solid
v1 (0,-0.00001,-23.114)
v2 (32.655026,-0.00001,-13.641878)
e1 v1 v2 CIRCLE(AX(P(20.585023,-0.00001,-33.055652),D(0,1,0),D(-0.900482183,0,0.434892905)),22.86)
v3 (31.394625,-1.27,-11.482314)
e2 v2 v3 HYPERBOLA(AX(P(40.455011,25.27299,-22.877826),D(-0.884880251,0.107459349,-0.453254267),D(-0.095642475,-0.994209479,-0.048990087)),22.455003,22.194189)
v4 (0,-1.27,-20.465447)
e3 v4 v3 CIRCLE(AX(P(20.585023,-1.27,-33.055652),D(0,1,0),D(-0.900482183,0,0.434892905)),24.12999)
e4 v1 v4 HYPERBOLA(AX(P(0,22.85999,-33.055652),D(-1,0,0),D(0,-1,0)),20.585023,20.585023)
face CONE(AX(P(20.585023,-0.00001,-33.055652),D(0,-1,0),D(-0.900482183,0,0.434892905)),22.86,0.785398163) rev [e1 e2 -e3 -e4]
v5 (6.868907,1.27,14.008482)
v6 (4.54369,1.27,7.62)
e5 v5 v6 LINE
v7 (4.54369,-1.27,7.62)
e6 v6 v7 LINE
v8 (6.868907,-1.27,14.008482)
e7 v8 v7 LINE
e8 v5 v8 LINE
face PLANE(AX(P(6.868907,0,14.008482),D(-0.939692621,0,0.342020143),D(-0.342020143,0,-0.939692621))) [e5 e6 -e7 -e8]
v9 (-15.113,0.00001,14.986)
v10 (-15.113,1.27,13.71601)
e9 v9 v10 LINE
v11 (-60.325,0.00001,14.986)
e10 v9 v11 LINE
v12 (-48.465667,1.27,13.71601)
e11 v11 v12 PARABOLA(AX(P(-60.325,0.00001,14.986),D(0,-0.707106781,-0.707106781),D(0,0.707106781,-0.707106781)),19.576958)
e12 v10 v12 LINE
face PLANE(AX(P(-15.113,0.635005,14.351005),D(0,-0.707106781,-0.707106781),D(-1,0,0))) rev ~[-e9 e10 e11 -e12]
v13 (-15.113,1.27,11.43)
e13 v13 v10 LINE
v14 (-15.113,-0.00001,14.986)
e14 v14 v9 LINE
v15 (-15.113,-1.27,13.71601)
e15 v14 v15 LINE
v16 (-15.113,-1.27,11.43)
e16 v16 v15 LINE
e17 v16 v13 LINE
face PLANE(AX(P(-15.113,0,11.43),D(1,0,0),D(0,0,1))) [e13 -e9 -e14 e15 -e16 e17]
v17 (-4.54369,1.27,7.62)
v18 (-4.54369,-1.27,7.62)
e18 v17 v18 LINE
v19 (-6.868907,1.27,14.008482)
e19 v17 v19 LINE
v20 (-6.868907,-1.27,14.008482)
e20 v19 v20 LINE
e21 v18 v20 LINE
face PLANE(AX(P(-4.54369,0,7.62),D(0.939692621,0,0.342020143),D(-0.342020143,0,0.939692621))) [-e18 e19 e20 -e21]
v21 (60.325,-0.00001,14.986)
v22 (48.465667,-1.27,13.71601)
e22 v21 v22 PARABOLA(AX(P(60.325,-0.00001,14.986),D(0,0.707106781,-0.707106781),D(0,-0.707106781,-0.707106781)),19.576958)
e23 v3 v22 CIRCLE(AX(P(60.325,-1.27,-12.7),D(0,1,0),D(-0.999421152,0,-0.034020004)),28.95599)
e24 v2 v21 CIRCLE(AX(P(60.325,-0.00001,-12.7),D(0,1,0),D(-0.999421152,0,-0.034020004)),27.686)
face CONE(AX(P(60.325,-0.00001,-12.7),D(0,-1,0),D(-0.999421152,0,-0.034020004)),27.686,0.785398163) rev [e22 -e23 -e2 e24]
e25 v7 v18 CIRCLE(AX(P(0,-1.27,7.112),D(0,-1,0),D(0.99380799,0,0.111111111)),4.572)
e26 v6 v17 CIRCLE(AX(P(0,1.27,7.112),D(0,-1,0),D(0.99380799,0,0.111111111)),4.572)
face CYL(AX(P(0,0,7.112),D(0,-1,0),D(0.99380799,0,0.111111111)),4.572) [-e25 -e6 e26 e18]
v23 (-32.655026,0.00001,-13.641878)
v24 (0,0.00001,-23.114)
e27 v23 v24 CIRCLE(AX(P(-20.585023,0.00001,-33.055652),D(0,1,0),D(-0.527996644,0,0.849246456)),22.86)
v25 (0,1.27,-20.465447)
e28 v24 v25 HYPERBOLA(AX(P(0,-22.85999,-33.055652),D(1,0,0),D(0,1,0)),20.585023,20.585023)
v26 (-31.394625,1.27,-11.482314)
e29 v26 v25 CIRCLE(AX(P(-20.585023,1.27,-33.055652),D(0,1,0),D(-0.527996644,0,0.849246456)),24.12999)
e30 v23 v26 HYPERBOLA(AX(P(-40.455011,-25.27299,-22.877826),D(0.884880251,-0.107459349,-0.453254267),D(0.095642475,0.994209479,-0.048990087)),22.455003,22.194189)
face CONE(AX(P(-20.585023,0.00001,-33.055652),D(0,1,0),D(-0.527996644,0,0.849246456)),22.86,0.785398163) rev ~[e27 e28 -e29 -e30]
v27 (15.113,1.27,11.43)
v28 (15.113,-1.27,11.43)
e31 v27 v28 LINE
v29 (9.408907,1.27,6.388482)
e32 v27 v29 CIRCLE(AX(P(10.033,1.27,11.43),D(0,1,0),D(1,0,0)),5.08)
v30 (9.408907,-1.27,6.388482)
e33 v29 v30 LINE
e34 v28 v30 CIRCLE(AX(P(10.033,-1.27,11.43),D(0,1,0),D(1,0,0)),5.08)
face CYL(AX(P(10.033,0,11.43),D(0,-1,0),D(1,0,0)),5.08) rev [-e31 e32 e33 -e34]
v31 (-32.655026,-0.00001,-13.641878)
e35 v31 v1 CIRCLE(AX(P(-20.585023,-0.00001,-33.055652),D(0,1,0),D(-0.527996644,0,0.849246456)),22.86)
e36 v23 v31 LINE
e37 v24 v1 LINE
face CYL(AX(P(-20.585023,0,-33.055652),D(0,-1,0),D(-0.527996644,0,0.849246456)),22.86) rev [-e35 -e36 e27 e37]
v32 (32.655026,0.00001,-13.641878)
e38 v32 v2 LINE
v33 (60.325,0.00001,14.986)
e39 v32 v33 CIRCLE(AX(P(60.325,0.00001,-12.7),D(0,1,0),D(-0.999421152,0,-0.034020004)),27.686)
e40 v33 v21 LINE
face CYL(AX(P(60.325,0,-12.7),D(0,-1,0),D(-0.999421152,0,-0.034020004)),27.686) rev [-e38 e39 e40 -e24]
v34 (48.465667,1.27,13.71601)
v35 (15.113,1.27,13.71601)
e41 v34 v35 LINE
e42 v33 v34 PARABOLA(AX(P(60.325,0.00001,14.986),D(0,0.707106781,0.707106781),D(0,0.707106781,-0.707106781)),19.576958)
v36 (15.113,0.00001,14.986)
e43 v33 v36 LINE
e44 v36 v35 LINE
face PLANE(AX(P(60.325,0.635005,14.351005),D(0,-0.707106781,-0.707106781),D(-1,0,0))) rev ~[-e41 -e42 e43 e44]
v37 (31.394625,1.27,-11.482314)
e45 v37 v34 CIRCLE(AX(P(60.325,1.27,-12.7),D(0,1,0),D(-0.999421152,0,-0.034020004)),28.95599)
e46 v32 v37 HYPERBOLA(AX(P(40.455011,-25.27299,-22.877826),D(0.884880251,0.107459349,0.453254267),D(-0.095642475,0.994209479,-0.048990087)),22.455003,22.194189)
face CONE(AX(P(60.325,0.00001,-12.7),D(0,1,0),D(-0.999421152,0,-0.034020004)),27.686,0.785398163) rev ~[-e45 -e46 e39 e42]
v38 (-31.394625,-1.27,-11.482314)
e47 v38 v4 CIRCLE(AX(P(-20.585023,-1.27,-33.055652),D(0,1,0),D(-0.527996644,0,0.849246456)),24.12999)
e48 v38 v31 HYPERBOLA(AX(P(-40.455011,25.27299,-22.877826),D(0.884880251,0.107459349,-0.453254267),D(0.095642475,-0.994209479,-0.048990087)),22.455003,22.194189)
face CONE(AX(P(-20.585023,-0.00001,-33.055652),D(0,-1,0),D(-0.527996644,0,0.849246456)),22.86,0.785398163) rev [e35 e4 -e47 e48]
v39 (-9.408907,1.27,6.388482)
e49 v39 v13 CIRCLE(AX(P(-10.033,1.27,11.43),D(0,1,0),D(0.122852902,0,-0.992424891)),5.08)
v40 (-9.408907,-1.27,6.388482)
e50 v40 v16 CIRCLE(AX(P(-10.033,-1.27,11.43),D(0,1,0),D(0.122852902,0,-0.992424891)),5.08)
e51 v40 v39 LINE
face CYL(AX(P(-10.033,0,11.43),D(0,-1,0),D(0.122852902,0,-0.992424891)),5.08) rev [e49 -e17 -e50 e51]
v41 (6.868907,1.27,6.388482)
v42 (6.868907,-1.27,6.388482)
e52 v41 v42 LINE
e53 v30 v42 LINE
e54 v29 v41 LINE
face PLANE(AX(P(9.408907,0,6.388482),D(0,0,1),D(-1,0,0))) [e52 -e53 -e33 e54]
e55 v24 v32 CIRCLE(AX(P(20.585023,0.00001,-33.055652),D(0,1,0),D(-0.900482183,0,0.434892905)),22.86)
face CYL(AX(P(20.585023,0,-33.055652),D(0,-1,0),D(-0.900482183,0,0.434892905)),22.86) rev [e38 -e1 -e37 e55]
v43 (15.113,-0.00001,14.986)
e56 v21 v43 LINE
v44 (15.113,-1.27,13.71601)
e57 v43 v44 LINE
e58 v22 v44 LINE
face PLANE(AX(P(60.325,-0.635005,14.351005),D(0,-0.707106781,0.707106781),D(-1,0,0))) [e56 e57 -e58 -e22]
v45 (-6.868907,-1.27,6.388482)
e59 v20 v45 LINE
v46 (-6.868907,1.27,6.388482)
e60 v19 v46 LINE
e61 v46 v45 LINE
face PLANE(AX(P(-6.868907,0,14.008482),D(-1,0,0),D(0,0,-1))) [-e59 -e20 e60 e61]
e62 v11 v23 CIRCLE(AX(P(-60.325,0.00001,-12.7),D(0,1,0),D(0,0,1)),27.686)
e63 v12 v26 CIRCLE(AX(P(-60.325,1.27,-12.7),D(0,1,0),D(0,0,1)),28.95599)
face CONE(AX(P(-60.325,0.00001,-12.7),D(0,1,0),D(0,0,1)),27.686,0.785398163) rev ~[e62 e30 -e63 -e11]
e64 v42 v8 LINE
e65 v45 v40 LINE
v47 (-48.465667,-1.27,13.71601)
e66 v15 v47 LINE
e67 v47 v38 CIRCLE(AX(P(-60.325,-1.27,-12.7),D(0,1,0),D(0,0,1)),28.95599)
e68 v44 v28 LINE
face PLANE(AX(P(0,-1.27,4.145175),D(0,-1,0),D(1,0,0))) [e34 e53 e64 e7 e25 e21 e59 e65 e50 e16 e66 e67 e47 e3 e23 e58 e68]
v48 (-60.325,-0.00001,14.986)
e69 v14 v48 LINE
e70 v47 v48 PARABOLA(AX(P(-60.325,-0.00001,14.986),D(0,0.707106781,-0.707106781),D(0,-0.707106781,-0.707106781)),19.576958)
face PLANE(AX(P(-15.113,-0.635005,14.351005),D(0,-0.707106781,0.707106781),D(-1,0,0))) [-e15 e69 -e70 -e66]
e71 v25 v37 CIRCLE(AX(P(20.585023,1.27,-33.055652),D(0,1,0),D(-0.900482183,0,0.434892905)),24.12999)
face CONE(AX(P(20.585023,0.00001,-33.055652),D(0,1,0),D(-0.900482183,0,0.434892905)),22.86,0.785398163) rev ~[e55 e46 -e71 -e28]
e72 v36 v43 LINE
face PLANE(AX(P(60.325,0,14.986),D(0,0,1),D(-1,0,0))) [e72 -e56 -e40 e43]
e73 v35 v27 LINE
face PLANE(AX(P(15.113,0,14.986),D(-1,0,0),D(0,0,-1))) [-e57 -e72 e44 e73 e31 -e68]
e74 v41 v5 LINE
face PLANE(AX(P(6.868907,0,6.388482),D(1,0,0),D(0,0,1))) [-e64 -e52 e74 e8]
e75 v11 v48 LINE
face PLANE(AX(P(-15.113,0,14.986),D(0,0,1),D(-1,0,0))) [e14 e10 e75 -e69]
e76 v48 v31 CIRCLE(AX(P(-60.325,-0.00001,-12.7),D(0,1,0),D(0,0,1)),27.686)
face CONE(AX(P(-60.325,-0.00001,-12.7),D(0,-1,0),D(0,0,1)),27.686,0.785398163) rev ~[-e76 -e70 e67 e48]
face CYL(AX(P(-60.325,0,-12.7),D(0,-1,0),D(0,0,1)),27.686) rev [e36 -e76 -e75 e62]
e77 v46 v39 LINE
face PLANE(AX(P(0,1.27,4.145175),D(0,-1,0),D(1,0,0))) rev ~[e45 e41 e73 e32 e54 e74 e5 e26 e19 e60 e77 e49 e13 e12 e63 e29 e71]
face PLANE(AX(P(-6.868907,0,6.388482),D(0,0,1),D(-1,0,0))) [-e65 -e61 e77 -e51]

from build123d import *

# Parameters (mm, degrees)
F1_DEPTH = 1.27
F2_SIZE  = 1.26999


# Not quite as in the source:
# - a fillet or chamfer is up to 0.001 mm smaller than in the source, because OpenCascade refuses the exact size
# - a feature names something its author has since deleted; it is built from what else it names


with BuildPart() as f1:
    # F0 (on Front) → F1 (new body, symmetric)
    with BuildSketch(Plane.XZ):
        with BuildLine():
            Line((-15.113, 14.986), (-60.325, 14.986))
            ThreePointArc((-60.325, 14.986), (-40.4178225843, 6.541072822), (-32.6550259817, -13.6418778197))
            ThreePointArc((-32.6550259817, -13.6418778197), (-14.2166113122, -11.1006310534), (0, -23.114))
            ThreePointArc((0, -23.114), (14.2166113122, -11.1006310534), (32.6550259817, -13.6418778197))
            ThreePointArc((32.6550259817, -13.6418778197), (40.4178225843, 6.541072822), (60.325, 14.986))
            Line((60.325, 14.986), (15.113, 14.986))
            Line((15.113, 14.986), (15.113, 11.43))
            ThreePointArc((15.113, 11.43), (13.3972241951, 7.623637489), (9.4089072578, 6.3884815532))
            Line((9.4089072578, 6.3884815532), (6.8689072578, 6.3884815532))
            Line((6.8689072578, 6.3884815532), (6.8689072578, 14.0084815532))
            Line((6.8689072578, 14.0084815532), (4.5436901303, 7.62))
            ThreePointArc((4.5436901303, 7.62), (0, 11.684), (-4.5436901303, 7.62))
            Line((-4.5436901303, 7.62), (-6.8689072578, 14.0084815532))
            Line((-6.8689072578, 14.0084815532), (-6.8689072578, 6.3884815532))
            Line((-6.8689072578, 6.3884815532), (-9.4089072578, 6.3884815532))
            ThreePointArc((-9.4089072578, 6.3884815532), (-13.3972241951, 7.623637489), (-15.113, 11.43))
            Line((-15.113, 11.43), (-15.113, 14.986))
        make_face()
    extrude(amount=F1_DEPTH, both=True)

    # F2 (size 1.27 in the source; OpenCascade refuses exactly that, so slightly less here)
    f2_edges = [f1.edges().sort_by_distance(p)[0] for p in [
        (-40.417823, -1.27, 6.541073),
        (-37.719, -1.27, 14.986),
        (-14.216611, -1.27, -11.100631),
        (-14.216611, 1.27, -11.100631),
        (-40.417823, 1.27, 6.541073),
        (-37.719, 1.27, 14.986),
        (37.719, -1.27, 14.986),
        (40.417823, -1.27, 6.541073),
        (14.216611, -1.27, -11.100631),
        (37.719, 1.27, 14.986),
        (40.417823, 1.27, 6.541073),
        (14.216611, 1.27, -11.100631),
    ]]
    chamfer(f2_edges, length=F2_SIZE)


solid = f1.part
